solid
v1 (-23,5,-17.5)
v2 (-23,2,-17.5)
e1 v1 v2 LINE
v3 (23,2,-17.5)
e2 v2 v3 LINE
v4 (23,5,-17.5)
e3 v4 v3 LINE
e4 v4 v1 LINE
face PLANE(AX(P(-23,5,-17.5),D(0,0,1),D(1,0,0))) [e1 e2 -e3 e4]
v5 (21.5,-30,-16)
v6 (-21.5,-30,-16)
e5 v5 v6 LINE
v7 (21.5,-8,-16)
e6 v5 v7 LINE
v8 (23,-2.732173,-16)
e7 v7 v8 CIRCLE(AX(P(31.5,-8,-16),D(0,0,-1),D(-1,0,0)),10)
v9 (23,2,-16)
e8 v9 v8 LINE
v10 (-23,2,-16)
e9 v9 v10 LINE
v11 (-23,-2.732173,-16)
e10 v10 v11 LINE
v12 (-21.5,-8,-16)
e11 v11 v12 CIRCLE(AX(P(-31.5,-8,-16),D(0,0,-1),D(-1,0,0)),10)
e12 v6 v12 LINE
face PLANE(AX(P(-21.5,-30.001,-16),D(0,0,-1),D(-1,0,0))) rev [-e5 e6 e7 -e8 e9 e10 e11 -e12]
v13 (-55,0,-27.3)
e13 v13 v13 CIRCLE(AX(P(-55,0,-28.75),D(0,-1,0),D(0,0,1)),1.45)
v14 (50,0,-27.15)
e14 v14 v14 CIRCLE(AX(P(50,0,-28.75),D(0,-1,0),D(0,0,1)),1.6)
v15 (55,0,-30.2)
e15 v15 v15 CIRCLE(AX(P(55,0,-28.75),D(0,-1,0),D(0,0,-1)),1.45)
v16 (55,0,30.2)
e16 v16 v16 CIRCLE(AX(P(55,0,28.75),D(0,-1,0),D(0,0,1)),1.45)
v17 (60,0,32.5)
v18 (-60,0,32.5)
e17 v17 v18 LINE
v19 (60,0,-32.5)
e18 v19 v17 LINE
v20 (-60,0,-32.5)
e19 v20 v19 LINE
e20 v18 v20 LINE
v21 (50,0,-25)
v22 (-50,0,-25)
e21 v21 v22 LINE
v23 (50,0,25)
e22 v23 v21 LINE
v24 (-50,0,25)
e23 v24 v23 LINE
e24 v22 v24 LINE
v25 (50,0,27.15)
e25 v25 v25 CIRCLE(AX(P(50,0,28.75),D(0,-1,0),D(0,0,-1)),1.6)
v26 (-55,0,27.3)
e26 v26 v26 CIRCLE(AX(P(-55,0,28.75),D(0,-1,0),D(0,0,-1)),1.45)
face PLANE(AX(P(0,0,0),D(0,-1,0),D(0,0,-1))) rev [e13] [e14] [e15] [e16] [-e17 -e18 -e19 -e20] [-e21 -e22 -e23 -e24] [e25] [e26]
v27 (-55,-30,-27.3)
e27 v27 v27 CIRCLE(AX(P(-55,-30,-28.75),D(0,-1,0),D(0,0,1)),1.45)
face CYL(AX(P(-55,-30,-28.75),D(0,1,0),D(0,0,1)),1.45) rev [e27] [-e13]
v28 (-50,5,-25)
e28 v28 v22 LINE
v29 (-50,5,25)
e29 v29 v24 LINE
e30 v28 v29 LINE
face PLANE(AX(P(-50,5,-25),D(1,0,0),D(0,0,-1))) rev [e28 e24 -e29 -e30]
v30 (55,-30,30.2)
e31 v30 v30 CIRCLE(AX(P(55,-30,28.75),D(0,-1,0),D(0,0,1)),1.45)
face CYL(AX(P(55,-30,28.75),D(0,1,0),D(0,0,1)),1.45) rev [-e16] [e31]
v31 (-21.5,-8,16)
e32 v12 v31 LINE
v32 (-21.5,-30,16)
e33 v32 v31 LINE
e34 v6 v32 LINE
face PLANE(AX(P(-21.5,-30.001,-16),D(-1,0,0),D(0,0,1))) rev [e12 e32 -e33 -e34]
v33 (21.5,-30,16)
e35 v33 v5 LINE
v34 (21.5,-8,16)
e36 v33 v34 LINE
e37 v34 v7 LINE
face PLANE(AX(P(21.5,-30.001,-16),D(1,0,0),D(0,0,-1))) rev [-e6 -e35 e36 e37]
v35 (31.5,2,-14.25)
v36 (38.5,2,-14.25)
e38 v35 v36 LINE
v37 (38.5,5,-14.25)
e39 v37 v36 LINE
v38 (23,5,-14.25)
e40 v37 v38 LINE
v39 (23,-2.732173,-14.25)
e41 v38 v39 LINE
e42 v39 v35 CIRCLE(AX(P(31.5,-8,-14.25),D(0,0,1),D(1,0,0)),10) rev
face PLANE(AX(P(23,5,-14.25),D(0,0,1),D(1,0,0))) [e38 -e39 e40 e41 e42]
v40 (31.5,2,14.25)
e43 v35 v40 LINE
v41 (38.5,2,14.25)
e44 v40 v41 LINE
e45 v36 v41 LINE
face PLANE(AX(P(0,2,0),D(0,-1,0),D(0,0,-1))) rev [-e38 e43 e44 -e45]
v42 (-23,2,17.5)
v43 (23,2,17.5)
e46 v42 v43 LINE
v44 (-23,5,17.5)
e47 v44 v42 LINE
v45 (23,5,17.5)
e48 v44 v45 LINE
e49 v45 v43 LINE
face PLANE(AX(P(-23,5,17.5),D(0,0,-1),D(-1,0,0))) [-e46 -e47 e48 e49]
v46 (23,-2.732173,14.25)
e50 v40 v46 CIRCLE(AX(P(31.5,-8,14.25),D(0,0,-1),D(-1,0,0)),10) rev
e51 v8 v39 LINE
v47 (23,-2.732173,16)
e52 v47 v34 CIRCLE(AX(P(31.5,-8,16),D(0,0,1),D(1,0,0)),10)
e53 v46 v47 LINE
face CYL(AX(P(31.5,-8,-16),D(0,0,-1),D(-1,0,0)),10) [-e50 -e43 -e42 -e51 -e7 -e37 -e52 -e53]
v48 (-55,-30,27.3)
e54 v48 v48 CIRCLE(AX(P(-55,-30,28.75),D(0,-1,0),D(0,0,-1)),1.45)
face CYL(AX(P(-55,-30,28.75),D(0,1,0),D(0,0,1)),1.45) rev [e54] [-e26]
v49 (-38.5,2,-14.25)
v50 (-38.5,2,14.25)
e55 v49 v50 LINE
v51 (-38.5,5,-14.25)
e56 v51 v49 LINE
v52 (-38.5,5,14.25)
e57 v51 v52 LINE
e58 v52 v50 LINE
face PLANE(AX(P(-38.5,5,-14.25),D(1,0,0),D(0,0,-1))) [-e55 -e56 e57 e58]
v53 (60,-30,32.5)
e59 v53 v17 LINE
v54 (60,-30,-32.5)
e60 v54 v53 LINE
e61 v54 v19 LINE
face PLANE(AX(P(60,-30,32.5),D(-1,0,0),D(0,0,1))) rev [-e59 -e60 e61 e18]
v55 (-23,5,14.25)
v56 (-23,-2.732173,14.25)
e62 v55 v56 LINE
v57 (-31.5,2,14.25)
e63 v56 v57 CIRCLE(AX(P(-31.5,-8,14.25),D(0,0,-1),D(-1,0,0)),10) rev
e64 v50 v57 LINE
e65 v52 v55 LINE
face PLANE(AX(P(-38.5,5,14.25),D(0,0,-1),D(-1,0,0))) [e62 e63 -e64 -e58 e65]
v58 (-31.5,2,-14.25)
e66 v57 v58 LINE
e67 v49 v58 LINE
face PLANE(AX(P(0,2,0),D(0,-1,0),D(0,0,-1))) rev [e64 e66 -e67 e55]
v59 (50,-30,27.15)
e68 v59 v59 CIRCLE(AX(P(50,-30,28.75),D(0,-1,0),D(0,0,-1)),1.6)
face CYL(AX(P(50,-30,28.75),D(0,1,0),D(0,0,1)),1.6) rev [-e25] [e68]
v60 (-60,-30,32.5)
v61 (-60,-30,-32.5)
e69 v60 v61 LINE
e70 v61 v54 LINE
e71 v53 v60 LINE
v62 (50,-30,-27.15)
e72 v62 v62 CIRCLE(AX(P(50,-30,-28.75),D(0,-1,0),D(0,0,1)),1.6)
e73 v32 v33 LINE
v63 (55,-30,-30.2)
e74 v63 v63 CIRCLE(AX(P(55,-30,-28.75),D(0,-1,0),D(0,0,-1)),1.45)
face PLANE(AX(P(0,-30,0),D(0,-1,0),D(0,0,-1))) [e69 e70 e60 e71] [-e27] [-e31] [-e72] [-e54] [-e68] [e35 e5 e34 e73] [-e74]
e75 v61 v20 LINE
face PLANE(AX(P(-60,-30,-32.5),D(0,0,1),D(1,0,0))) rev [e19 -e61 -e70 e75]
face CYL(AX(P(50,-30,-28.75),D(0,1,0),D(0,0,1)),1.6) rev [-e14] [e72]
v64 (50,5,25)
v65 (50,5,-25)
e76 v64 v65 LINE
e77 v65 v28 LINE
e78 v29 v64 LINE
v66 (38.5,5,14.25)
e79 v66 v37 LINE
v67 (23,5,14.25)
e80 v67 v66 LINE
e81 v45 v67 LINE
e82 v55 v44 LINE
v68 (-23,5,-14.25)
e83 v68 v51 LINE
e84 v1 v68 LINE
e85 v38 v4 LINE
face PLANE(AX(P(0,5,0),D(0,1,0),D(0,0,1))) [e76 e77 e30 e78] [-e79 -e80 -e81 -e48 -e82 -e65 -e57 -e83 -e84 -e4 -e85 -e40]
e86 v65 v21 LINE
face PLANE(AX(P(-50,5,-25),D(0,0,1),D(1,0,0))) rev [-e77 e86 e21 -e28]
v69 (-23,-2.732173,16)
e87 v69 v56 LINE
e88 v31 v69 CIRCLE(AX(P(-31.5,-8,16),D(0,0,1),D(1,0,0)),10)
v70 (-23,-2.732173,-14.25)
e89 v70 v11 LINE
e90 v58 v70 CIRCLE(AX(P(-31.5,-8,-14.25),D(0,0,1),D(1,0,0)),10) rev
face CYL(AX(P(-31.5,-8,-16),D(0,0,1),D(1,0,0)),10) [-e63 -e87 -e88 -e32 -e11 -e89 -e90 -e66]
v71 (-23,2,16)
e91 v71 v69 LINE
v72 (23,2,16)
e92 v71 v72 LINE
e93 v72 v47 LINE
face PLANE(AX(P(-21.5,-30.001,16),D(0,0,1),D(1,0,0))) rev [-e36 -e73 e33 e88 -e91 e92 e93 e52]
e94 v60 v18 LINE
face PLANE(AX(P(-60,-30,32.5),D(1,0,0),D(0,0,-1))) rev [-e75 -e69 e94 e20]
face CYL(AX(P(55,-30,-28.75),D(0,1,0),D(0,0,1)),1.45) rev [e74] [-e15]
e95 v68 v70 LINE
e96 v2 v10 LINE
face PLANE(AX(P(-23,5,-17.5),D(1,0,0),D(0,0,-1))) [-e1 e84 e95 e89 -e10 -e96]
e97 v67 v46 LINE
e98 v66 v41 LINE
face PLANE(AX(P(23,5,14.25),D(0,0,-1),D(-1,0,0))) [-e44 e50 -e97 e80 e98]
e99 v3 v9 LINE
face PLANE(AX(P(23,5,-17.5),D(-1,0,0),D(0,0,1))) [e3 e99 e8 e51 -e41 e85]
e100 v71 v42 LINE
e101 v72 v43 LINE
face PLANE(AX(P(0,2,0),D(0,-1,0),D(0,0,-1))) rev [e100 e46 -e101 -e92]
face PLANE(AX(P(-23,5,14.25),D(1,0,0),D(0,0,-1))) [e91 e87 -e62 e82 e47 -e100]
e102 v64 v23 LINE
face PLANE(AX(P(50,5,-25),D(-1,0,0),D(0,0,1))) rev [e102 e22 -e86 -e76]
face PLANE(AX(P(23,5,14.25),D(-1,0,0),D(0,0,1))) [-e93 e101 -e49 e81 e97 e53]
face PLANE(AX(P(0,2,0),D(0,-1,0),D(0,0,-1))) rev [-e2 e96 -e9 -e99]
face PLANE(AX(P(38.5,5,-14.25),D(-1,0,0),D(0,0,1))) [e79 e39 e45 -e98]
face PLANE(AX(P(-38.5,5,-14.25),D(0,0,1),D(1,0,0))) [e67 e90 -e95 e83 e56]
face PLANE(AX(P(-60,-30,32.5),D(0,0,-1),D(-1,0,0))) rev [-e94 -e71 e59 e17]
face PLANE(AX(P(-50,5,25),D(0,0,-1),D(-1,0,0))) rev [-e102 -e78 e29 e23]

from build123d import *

# Parameters (mm, degrees)
BOSS_EXTRUDE3_DEPTH = 2
SKETCH1_6_W         = 100
SKETCH1_6_H         = 50
BOSS_EXTRUDE4_DEPTH = 5
SKETCH2_W           = 120
SKETCH2_H           = 65
SKETCH2_R           = 1.45
SKETCH2_R_2         = 1.6
BOSS_EXTRUDE5_DEPTH = 30
SKETCH2_2_W         = 120
SKETCH2_2_H         = 65
SKETCH2_2_R         = 1.45
SKETCH2_2_R_2       = 1.6
BOSS_EXTRUDE6_DEPTH = 3
CUT_EXTRUDE1_REACH  = 77.367
SKETCH7_W           = 43
SKETCH7_H           = 32
FILLET1_R           = 10


with BuildPart() as part:
    # Sketch1 → Boss-Extrude3 (new body)
    with BuildSketch(Plane(origin=(0, 0, 0), x_dir=(1, 0, 0), z_dir=(0, 1, 0))):
        Polygon((23, -14.25), (23, -17.5), (-23, -17.5), (-23, -14.25), (-38.5, -14.25), (-38.5, 14.25), (-23, 14.25), (-23, 17.5), (23, 17.5), (23, 14.25), (38.5, 14.25), (38.5, -14.25), align=None)
    extrude(amount=BOSS_EXTRUDE3_DEPTH)

    # Sketch1<6> → Boss-Extrude4 (add)
    with BuildSketch(Plane(origin=(0, 0, 0), x_dir=(1, 0, 0), z_dir=(0, 1, 0))):
        Rectangle(SKETCH1_6_W, SKETCH1_6_H)
        Polygon((23, -14.25), (23, -17.5), (-23, -17.5), (-23, -14.25), (-38.5, -14.25), (-38.5, 14.25), (-23, 14.25), (-23, 17.5), (23, 17.5), (23, 14.25), (38.5, 14.25), (38.5, -14.25), align=None, mode=Mode.SUBTRACT)
    extrude(amount=BOSS_EXTRUDE4_DEPTH)

    # Sketch2 → Boss-Extrude5 (add)
    with BuildSketch(Plane.XZ):
        Rectangle(SKETCH2_W, SKETCH2_H)
        with Locations(Location((-55, 28.75, 0), (0, 0, 270))):
            Circle(SKETCH2_R, mode=Mode.SUBTRACT)
        with Locations(Location((55, 28.75, 0), (0, 0, 90))):
            Circle(SKETCH2_R, mode=Mode.SUBTRACT)
        with Locations(Location((55, -28.75, 0), (0, 0, 270))):
            Circle(SKETCH2_R, mode=Mode.SUBTRACT)
        with Locations(Location((-55, -28.75, 0), (0, 0, 90))):
            Circle(SKETCH2_R, mode=Mode.SUBTRACT)
        with Locations(Location((50, 28.75, 0), (0, 0, 270))):
            Circle(SKETCH2_R_2, mode=Mode.SUBTRACT)
        with Locations(Location((50, -28.75, 0), (0, 0, 90))):
            Circle(SKETCH2_R_2, mode=Mode.SUBTRACT)
    extrude(amount=BOSS_EXTRUDE5_DEPTH)

    # Sketch2<2> → Boss-Extrude6 (add)
    with BuildSketch(Plane.XZ):
        Rectangle(SKETCH2_2_W, SKETCH2_2_H)
        with Locations(Location((-55, 28.75, 0), (0, 0, 270))):
            Circle(SKETCH2_2_R, mode=Mode.SUBTRACT)
        with Locations(Location((55, 28.75, 0), (0, 0, 90))):
            Circle(SKETCH2_2_R, mode=Mode.SUBTRACT)
        with Locations(Location((55, -28.75, 0), (0, 0, 270))):
            Circle(SKETCH2_2_R, mode=Mode.SUBTRACT)
        with Locations(Location((-55, -28.75, 0), (0, 0, 90))):
            Circle(SKETCH2_2_R, mode=Mode.SUBTRACT)
        with Locations(Location((50, 28.75, 0), (0, 0, 270))):
            Circle(SKETCH2_2_R_2, mode=Mode.SUBTRACT)
        with Locations(Location((50, -28.75, 0), (0, 0, 90))):
            Circle(SKETCH2_2_R_2, mode=Mode.SUBTRACT)
    extrude(amount=BOSS_EXTRUDE6_DEPTH)

    # Sketch7 → Cut-Extrude1 (cut, up to next)
    with BuildSketch(Plane(origin=(0, 2, 0), x_dir=(1, 0, 0), z_dir=(0, 1, 0)), mode=Mode.PRIVATE) as cut_extrude1_sk1:
        Rectangle(SKETCH7_W, SKETCH7_H)
    cut_extrude1_tool1 = extrude(cut_extrude1_sk1.sketch, amount=-CUT_EXTRUDE1_REACH, mode=Mode.PRIVATE) & part.part
    add(cut_extrude1_tool1.solids().sort_by_distance((0, 2, 0))[0], mode=Mode.SUBTRACT)

    # Fillet1
    # the kernel refuses this fillet: 10 mm, written as the material it takes off along each edge
    with BuildSketch(Plane(origin=(-21.5, 2, 16), x_dir=(0, -1, 0), z_dir=(0, 0, -1))) as fillet1_piece_1_section:
        with BuildLine():
            CenterArc((FILLET1_R, FILLET1_R), FILLET1_R, 180, 90)
            Line((0, FILLET1_R), (0, 0))
            Line((0, 0), (FILLET1_R, 0))
        make_face()
    fillet1_piece_1 = extrude(amount=32, mode=Mode.PRIVATE)
    fillet1_piece_1 = split(fillet1_piece_1, bisect_by=Plane(origin=(-23, -2.387167078, 15.125), z_dir=(1, 0, 0)), keep=Keep.TOP, mode=Mode.PRIVATE)
    add(fillet1_piece_1, mode=Mode.SUBTRACT)
    with BuildSketch(Plane(origin=(-21.5, 2, 41), x_dir=(0, -1, 0), z_dir=(0, 0, -1))) as fillet1_piece_2_section:
        with BuildLine():
            CenterArc((FILLET1_R, FILLET1_R), FILLET1_R, 180, 90)
            Line((0, FILLET1_R), (0, 0))
            Line((0, 0), (FILLET1_R, 0))
        make_face()
    fillet1_piece_2 = extrude(amount=82, mode=Mode.PRIVATE)
    fillet1_piece_2 = split(fillet1_piece_2, bisect_by=Plane(origin=(-23.780995079, -0.852225246, -14.25), z_dir=(0, 0, 1)), keep=Keep.TOP, mode=Mode.PRIVATE)
    fillet1_piece_2 = split(fillet1_piece_2, bisect_by=Plane(origin=(-23.780995079, -0.852225246, 14.25), z_dir=(0, 0, -1)), keep=Keep.TOP, mode=Mode.PRIVATE)
    add(fillet1_piece_2, mode=Mode.SUBTRACT)
    with BuildSketch(Plane(origin=(21.5, 2, -16), x_dir=(0, -1, 0), z_dir=(0, 0, 1))) as fillet1_piece_3_section:
        with BuildLine():
            CenterArc((FILLET1_R, FILLET1_R), FILLET1_R, 180, 90)
            Line((0, FILLET1_R), (0, 0))
            Line((0, 0), (FILLET1_R, 0))
        make_face()
    fillet1_piece_3 = extrude(amount=32, mode=Mode.PRIVATE)
    fillet1_piece_3 = split(fillet1_piece_3, bisect_by=Plane(origin=(23, -2.387167078, -15.125), z_dir=(-1, 0, 0)), keep=Keep.TOP, mode=Mode.PRIVATE)
    add(fillet1_piece_3, mode=Mode.SUBTRACT)
    with BuildSketch(Plane(origin=(21.5, 2, -41), x_dir=(0, -1, 0), z_dir=(0, 0, 1))) as fillet1_piece_4_section:
        with BuildLine():
            CenterArc((FILLET1_R, FILLET1_R), FILLET1_R, 180, 90)
            Line((0, FILLET1_R), (0, 0))
            Line((0, 0), (FILLET1_R, 0))
        make_face()
    fillet1_piece_4 = extrude(amount=82, mode=Mode.PRIVATE)
    fillet1_piece_4 = split(fillet1_piece_4, bisect_by=Plane(origin=(23.780995079, -0.852225246, 14.25), z_dir=(0, 0, -1)), keep=Keep.TOP, mode=Mode.PRIVATE)
    fillet1_piece_4 = split(fillet1_piece_4, bisect_by=Plane(origin=(23.780995079, -0.852225246, -14.25), z_dir=(0, 0, 1)), keep=Keep.TOP, mode=Mode.PRIVATE)
    add(fillet1_piece_4, mode=Mode.SUBTRACT)


solid = part.part
